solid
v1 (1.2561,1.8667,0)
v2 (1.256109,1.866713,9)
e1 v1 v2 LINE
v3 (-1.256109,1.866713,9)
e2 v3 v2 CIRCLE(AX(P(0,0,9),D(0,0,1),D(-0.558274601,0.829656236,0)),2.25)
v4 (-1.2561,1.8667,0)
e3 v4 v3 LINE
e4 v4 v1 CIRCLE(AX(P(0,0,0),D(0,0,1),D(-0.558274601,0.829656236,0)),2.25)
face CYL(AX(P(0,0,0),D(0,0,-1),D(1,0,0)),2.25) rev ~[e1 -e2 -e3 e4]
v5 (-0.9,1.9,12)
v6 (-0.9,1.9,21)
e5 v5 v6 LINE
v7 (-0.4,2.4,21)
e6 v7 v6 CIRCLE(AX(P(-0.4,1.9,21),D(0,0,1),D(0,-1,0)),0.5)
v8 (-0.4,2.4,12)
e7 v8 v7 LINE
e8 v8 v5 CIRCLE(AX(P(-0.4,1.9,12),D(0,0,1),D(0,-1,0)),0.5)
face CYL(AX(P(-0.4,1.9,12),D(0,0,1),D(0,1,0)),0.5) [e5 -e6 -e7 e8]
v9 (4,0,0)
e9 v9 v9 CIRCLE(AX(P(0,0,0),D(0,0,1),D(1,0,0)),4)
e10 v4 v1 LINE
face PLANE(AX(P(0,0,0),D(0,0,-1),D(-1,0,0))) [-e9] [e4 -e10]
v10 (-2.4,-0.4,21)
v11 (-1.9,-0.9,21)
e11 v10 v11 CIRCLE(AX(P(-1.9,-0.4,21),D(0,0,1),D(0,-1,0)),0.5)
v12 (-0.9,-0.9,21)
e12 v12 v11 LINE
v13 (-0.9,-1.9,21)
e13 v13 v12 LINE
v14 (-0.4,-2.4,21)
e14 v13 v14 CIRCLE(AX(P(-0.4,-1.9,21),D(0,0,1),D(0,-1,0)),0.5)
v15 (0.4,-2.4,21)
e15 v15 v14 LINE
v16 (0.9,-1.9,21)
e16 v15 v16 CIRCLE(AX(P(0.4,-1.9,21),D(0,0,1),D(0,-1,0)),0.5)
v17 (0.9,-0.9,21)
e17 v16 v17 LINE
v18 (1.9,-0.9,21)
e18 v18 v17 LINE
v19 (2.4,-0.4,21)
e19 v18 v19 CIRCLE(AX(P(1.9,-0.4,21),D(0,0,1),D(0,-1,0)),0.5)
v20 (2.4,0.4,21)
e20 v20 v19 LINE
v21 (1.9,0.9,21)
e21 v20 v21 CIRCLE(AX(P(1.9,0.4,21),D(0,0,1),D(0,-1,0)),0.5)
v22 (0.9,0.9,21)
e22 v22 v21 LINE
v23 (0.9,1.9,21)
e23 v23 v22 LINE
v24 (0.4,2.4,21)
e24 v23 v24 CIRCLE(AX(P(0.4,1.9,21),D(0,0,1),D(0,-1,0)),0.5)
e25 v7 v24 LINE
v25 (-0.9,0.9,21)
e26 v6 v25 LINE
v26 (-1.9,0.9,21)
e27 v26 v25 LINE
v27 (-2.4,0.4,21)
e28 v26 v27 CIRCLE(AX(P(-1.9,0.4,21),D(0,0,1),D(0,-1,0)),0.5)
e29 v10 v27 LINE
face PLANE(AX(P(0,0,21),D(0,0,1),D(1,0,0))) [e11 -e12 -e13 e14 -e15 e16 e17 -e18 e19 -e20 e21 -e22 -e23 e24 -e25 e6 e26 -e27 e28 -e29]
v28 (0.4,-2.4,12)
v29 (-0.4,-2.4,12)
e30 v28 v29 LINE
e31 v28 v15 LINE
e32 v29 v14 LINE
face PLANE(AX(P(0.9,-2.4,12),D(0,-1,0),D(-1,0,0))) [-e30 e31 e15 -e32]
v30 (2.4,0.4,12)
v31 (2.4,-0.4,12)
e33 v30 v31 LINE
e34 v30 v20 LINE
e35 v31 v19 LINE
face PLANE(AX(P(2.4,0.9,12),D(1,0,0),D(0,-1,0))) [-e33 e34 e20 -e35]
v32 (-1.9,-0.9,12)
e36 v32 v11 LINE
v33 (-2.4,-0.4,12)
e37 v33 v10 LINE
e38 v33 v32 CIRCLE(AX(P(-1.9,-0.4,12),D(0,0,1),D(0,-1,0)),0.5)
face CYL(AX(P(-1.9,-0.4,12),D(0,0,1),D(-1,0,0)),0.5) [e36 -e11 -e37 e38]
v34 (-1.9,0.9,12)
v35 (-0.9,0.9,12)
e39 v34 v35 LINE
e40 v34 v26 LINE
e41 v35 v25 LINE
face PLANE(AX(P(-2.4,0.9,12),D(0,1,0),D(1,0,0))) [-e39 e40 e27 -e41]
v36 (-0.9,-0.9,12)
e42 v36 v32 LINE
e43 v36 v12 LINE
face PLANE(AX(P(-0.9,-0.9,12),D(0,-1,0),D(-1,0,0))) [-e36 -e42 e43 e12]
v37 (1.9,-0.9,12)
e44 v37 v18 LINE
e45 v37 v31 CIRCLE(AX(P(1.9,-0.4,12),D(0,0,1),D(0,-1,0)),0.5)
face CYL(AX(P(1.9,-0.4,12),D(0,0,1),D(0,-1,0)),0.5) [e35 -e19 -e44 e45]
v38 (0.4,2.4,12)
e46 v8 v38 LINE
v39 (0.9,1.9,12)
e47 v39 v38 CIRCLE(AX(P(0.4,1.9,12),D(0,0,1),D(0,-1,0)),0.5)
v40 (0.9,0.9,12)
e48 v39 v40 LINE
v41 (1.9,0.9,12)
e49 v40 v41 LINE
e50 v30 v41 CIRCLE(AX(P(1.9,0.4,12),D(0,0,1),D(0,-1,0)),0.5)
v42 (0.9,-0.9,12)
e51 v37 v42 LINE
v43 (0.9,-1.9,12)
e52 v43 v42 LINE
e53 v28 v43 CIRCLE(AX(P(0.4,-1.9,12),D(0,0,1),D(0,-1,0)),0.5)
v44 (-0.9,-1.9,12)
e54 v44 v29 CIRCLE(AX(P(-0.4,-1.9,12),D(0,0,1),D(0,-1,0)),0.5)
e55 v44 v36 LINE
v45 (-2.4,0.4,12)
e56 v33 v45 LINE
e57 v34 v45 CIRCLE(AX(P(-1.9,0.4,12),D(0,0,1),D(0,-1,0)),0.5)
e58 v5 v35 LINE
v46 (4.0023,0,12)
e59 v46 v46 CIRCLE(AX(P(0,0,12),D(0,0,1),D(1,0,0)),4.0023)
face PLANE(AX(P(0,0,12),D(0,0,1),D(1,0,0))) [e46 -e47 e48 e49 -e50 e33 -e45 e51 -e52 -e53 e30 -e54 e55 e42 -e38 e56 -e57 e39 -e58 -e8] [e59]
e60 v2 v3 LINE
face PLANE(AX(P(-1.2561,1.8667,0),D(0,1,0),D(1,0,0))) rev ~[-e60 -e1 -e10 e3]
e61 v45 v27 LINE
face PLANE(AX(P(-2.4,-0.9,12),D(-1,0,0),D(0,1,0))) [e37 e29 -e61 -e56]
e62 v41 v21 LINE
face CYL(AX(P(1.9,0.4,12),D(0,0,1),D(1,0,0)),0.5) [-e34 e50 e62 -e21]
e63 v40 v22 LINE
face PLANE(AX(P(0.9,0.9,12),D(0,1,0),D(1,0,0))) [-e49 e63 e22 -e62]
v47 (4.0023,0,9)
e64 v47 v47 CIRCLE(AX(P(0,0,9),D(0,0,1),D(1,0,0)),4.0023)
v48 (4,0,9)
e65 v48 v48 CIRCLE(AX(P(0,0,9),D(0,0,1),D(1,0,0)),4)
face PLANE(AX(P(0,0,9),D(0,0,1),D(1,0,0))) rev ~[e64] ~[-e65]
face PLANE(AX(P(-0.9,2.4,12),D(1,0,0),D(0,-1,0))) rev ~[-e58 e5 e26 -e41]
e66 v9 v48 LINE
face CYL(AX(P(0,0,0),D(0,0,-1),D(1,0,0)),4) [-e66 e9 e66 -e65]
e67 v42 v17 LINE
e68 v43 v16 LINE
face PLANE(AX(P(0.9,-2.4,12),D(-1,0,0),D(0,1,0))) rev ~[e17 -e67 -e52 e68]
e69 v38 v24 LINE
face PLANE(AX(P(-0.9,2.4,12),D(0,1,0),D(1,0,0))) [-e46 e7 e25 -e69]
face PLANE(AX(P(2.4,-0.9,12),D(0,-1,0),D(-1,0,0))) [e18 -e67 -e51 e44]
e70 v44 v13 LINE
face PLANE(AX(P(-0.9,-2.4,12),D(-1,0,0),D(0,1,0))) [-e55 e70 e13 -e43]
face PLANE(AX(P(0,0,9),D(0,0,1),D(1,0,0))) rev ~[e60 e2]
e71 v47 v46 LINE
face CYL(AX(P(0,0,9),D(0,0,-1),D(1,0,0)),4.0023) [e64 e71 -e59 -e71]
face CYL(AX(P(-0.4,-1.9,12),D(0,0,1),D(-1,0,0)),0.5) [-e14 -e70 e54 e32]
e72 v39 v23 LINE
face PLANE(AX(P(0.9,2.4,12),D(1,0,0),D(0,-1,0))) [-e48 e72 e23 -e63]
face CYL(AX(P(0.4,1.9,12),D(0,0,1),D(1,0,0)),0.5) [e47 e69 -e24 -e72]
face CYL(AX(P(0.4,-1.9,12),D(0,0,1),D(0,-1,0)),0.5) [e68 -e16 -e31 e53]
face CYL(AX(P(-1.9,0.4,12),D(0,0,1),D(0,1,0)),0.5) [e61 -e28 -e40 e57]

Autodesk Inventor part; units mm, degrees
ref_plane "YZ Plane" through (0, 0, 0) normal (1, 0, 0) x (0, 1, 0)
ref_plane "XZ Plane" through (0, 0, 0) normal (0, 1, 0) x (-1, 0, 0)
ref_plane "XY Plane" through (0, 0, 0) normal (0, 0, 1) x (1, 0, 0)
sketch "Sketch1" plane through (0, 0, 0) normal (0, 0, 1) x (1, 0, 0)
  circle A0 centre (0, 0) radius 2.25
  circle A1 centre (0, 0) radius 4
  dimension "d0" = 4.5
  dimension "d1" = 8
extrude "Extrusion1" add sketch "Sketch1" along normal blind 9
sketch "Sketch2" plane through (0, 0, 9) normal (0, 0, 1) x (1, 0, 0)
  circle A0 centre (0, 0) radius 4.0023
extrude "Extrusion2" add sketch "Sketch2" along normal blind 3
sketch "Sketch3" plane through (0, 0, 12) normal (0, 0, 1) x (1, 0, 0)
  line L0 (2.4, 0.9) -> (2.4, -0.9)
  line L1 (-2.4, -0.9) -> (-2.4, 0.9)
  line L2 (-0.9, 2.4) -> (0.9, 2.4)
  line L3 (0.9, -2.4) -> (-0.9, -2.4)
  line L4 (-0.9, 2.4) -> (-0.9, 0.9)
  line L5 (-0.9, -2.4) -> (-0.9, -0.9)
  line L6 (0.9, 2.4) -> (0.9, 0.9)
  line L7 (0.9, -2.4) -> (0.9, -0.9)
  line L8 (2.4, -0.9) -> (0.9, -0.9)
  line L9 (-0.9, -0.9) -> (-2.4, -0.9)
  line L10 (-2.4, 0.9) -> (-0.9, 0.9)
  line L11 (0.9, 0.9) -> (2.4, 0.9)
  point P0 (0, 0)
  dimension "d6" = 4.8
  dimension "d7" = 1.8
  dimension "d8" = 2.4
  dimension "d10" = 1.8
  dimension "d11" = 4.8
  dimension "d12" = 2.4
extrude "Extrusion3" add sketch "Sketch3" along normal blind 9
fillet "Fillet1" radius 0.5 2 edges at (-0.9, 2.4, 16.5) (-2.4, 0.9, 16.5)
fillet "Fillet2" radius 0.5 1 edges at (-2.4, -0.9, 16.5)
fillet "Fillet3" radius 0.5 1 edges at (-0.9, -2.4, 16.5)
fillet "Fillet4" radius 0.5 4 edges at (0.9, 2.4, 16.5) (2.4, 0.9, 16.5) (2.4, -0.9, 16.5) (0.9, -2.4, 16.5)
sketch "Sketch5" plane through (0, 0, 0) normal (0, 0, -1) x (-1, 0, 0)
  line L0 (1.2561, 1.8667) -> (-1.2561, 1.8667)
  arc A0 (1.2561, 1.8667) -> (-1.2561, 1.8667) centre (0, 0) ccw
  point P0 (0, 0)
extrude "Extrusion4" add sketch "Sketch5" against normal blind 10
properties part number "Motor_Axle_Adapter"
